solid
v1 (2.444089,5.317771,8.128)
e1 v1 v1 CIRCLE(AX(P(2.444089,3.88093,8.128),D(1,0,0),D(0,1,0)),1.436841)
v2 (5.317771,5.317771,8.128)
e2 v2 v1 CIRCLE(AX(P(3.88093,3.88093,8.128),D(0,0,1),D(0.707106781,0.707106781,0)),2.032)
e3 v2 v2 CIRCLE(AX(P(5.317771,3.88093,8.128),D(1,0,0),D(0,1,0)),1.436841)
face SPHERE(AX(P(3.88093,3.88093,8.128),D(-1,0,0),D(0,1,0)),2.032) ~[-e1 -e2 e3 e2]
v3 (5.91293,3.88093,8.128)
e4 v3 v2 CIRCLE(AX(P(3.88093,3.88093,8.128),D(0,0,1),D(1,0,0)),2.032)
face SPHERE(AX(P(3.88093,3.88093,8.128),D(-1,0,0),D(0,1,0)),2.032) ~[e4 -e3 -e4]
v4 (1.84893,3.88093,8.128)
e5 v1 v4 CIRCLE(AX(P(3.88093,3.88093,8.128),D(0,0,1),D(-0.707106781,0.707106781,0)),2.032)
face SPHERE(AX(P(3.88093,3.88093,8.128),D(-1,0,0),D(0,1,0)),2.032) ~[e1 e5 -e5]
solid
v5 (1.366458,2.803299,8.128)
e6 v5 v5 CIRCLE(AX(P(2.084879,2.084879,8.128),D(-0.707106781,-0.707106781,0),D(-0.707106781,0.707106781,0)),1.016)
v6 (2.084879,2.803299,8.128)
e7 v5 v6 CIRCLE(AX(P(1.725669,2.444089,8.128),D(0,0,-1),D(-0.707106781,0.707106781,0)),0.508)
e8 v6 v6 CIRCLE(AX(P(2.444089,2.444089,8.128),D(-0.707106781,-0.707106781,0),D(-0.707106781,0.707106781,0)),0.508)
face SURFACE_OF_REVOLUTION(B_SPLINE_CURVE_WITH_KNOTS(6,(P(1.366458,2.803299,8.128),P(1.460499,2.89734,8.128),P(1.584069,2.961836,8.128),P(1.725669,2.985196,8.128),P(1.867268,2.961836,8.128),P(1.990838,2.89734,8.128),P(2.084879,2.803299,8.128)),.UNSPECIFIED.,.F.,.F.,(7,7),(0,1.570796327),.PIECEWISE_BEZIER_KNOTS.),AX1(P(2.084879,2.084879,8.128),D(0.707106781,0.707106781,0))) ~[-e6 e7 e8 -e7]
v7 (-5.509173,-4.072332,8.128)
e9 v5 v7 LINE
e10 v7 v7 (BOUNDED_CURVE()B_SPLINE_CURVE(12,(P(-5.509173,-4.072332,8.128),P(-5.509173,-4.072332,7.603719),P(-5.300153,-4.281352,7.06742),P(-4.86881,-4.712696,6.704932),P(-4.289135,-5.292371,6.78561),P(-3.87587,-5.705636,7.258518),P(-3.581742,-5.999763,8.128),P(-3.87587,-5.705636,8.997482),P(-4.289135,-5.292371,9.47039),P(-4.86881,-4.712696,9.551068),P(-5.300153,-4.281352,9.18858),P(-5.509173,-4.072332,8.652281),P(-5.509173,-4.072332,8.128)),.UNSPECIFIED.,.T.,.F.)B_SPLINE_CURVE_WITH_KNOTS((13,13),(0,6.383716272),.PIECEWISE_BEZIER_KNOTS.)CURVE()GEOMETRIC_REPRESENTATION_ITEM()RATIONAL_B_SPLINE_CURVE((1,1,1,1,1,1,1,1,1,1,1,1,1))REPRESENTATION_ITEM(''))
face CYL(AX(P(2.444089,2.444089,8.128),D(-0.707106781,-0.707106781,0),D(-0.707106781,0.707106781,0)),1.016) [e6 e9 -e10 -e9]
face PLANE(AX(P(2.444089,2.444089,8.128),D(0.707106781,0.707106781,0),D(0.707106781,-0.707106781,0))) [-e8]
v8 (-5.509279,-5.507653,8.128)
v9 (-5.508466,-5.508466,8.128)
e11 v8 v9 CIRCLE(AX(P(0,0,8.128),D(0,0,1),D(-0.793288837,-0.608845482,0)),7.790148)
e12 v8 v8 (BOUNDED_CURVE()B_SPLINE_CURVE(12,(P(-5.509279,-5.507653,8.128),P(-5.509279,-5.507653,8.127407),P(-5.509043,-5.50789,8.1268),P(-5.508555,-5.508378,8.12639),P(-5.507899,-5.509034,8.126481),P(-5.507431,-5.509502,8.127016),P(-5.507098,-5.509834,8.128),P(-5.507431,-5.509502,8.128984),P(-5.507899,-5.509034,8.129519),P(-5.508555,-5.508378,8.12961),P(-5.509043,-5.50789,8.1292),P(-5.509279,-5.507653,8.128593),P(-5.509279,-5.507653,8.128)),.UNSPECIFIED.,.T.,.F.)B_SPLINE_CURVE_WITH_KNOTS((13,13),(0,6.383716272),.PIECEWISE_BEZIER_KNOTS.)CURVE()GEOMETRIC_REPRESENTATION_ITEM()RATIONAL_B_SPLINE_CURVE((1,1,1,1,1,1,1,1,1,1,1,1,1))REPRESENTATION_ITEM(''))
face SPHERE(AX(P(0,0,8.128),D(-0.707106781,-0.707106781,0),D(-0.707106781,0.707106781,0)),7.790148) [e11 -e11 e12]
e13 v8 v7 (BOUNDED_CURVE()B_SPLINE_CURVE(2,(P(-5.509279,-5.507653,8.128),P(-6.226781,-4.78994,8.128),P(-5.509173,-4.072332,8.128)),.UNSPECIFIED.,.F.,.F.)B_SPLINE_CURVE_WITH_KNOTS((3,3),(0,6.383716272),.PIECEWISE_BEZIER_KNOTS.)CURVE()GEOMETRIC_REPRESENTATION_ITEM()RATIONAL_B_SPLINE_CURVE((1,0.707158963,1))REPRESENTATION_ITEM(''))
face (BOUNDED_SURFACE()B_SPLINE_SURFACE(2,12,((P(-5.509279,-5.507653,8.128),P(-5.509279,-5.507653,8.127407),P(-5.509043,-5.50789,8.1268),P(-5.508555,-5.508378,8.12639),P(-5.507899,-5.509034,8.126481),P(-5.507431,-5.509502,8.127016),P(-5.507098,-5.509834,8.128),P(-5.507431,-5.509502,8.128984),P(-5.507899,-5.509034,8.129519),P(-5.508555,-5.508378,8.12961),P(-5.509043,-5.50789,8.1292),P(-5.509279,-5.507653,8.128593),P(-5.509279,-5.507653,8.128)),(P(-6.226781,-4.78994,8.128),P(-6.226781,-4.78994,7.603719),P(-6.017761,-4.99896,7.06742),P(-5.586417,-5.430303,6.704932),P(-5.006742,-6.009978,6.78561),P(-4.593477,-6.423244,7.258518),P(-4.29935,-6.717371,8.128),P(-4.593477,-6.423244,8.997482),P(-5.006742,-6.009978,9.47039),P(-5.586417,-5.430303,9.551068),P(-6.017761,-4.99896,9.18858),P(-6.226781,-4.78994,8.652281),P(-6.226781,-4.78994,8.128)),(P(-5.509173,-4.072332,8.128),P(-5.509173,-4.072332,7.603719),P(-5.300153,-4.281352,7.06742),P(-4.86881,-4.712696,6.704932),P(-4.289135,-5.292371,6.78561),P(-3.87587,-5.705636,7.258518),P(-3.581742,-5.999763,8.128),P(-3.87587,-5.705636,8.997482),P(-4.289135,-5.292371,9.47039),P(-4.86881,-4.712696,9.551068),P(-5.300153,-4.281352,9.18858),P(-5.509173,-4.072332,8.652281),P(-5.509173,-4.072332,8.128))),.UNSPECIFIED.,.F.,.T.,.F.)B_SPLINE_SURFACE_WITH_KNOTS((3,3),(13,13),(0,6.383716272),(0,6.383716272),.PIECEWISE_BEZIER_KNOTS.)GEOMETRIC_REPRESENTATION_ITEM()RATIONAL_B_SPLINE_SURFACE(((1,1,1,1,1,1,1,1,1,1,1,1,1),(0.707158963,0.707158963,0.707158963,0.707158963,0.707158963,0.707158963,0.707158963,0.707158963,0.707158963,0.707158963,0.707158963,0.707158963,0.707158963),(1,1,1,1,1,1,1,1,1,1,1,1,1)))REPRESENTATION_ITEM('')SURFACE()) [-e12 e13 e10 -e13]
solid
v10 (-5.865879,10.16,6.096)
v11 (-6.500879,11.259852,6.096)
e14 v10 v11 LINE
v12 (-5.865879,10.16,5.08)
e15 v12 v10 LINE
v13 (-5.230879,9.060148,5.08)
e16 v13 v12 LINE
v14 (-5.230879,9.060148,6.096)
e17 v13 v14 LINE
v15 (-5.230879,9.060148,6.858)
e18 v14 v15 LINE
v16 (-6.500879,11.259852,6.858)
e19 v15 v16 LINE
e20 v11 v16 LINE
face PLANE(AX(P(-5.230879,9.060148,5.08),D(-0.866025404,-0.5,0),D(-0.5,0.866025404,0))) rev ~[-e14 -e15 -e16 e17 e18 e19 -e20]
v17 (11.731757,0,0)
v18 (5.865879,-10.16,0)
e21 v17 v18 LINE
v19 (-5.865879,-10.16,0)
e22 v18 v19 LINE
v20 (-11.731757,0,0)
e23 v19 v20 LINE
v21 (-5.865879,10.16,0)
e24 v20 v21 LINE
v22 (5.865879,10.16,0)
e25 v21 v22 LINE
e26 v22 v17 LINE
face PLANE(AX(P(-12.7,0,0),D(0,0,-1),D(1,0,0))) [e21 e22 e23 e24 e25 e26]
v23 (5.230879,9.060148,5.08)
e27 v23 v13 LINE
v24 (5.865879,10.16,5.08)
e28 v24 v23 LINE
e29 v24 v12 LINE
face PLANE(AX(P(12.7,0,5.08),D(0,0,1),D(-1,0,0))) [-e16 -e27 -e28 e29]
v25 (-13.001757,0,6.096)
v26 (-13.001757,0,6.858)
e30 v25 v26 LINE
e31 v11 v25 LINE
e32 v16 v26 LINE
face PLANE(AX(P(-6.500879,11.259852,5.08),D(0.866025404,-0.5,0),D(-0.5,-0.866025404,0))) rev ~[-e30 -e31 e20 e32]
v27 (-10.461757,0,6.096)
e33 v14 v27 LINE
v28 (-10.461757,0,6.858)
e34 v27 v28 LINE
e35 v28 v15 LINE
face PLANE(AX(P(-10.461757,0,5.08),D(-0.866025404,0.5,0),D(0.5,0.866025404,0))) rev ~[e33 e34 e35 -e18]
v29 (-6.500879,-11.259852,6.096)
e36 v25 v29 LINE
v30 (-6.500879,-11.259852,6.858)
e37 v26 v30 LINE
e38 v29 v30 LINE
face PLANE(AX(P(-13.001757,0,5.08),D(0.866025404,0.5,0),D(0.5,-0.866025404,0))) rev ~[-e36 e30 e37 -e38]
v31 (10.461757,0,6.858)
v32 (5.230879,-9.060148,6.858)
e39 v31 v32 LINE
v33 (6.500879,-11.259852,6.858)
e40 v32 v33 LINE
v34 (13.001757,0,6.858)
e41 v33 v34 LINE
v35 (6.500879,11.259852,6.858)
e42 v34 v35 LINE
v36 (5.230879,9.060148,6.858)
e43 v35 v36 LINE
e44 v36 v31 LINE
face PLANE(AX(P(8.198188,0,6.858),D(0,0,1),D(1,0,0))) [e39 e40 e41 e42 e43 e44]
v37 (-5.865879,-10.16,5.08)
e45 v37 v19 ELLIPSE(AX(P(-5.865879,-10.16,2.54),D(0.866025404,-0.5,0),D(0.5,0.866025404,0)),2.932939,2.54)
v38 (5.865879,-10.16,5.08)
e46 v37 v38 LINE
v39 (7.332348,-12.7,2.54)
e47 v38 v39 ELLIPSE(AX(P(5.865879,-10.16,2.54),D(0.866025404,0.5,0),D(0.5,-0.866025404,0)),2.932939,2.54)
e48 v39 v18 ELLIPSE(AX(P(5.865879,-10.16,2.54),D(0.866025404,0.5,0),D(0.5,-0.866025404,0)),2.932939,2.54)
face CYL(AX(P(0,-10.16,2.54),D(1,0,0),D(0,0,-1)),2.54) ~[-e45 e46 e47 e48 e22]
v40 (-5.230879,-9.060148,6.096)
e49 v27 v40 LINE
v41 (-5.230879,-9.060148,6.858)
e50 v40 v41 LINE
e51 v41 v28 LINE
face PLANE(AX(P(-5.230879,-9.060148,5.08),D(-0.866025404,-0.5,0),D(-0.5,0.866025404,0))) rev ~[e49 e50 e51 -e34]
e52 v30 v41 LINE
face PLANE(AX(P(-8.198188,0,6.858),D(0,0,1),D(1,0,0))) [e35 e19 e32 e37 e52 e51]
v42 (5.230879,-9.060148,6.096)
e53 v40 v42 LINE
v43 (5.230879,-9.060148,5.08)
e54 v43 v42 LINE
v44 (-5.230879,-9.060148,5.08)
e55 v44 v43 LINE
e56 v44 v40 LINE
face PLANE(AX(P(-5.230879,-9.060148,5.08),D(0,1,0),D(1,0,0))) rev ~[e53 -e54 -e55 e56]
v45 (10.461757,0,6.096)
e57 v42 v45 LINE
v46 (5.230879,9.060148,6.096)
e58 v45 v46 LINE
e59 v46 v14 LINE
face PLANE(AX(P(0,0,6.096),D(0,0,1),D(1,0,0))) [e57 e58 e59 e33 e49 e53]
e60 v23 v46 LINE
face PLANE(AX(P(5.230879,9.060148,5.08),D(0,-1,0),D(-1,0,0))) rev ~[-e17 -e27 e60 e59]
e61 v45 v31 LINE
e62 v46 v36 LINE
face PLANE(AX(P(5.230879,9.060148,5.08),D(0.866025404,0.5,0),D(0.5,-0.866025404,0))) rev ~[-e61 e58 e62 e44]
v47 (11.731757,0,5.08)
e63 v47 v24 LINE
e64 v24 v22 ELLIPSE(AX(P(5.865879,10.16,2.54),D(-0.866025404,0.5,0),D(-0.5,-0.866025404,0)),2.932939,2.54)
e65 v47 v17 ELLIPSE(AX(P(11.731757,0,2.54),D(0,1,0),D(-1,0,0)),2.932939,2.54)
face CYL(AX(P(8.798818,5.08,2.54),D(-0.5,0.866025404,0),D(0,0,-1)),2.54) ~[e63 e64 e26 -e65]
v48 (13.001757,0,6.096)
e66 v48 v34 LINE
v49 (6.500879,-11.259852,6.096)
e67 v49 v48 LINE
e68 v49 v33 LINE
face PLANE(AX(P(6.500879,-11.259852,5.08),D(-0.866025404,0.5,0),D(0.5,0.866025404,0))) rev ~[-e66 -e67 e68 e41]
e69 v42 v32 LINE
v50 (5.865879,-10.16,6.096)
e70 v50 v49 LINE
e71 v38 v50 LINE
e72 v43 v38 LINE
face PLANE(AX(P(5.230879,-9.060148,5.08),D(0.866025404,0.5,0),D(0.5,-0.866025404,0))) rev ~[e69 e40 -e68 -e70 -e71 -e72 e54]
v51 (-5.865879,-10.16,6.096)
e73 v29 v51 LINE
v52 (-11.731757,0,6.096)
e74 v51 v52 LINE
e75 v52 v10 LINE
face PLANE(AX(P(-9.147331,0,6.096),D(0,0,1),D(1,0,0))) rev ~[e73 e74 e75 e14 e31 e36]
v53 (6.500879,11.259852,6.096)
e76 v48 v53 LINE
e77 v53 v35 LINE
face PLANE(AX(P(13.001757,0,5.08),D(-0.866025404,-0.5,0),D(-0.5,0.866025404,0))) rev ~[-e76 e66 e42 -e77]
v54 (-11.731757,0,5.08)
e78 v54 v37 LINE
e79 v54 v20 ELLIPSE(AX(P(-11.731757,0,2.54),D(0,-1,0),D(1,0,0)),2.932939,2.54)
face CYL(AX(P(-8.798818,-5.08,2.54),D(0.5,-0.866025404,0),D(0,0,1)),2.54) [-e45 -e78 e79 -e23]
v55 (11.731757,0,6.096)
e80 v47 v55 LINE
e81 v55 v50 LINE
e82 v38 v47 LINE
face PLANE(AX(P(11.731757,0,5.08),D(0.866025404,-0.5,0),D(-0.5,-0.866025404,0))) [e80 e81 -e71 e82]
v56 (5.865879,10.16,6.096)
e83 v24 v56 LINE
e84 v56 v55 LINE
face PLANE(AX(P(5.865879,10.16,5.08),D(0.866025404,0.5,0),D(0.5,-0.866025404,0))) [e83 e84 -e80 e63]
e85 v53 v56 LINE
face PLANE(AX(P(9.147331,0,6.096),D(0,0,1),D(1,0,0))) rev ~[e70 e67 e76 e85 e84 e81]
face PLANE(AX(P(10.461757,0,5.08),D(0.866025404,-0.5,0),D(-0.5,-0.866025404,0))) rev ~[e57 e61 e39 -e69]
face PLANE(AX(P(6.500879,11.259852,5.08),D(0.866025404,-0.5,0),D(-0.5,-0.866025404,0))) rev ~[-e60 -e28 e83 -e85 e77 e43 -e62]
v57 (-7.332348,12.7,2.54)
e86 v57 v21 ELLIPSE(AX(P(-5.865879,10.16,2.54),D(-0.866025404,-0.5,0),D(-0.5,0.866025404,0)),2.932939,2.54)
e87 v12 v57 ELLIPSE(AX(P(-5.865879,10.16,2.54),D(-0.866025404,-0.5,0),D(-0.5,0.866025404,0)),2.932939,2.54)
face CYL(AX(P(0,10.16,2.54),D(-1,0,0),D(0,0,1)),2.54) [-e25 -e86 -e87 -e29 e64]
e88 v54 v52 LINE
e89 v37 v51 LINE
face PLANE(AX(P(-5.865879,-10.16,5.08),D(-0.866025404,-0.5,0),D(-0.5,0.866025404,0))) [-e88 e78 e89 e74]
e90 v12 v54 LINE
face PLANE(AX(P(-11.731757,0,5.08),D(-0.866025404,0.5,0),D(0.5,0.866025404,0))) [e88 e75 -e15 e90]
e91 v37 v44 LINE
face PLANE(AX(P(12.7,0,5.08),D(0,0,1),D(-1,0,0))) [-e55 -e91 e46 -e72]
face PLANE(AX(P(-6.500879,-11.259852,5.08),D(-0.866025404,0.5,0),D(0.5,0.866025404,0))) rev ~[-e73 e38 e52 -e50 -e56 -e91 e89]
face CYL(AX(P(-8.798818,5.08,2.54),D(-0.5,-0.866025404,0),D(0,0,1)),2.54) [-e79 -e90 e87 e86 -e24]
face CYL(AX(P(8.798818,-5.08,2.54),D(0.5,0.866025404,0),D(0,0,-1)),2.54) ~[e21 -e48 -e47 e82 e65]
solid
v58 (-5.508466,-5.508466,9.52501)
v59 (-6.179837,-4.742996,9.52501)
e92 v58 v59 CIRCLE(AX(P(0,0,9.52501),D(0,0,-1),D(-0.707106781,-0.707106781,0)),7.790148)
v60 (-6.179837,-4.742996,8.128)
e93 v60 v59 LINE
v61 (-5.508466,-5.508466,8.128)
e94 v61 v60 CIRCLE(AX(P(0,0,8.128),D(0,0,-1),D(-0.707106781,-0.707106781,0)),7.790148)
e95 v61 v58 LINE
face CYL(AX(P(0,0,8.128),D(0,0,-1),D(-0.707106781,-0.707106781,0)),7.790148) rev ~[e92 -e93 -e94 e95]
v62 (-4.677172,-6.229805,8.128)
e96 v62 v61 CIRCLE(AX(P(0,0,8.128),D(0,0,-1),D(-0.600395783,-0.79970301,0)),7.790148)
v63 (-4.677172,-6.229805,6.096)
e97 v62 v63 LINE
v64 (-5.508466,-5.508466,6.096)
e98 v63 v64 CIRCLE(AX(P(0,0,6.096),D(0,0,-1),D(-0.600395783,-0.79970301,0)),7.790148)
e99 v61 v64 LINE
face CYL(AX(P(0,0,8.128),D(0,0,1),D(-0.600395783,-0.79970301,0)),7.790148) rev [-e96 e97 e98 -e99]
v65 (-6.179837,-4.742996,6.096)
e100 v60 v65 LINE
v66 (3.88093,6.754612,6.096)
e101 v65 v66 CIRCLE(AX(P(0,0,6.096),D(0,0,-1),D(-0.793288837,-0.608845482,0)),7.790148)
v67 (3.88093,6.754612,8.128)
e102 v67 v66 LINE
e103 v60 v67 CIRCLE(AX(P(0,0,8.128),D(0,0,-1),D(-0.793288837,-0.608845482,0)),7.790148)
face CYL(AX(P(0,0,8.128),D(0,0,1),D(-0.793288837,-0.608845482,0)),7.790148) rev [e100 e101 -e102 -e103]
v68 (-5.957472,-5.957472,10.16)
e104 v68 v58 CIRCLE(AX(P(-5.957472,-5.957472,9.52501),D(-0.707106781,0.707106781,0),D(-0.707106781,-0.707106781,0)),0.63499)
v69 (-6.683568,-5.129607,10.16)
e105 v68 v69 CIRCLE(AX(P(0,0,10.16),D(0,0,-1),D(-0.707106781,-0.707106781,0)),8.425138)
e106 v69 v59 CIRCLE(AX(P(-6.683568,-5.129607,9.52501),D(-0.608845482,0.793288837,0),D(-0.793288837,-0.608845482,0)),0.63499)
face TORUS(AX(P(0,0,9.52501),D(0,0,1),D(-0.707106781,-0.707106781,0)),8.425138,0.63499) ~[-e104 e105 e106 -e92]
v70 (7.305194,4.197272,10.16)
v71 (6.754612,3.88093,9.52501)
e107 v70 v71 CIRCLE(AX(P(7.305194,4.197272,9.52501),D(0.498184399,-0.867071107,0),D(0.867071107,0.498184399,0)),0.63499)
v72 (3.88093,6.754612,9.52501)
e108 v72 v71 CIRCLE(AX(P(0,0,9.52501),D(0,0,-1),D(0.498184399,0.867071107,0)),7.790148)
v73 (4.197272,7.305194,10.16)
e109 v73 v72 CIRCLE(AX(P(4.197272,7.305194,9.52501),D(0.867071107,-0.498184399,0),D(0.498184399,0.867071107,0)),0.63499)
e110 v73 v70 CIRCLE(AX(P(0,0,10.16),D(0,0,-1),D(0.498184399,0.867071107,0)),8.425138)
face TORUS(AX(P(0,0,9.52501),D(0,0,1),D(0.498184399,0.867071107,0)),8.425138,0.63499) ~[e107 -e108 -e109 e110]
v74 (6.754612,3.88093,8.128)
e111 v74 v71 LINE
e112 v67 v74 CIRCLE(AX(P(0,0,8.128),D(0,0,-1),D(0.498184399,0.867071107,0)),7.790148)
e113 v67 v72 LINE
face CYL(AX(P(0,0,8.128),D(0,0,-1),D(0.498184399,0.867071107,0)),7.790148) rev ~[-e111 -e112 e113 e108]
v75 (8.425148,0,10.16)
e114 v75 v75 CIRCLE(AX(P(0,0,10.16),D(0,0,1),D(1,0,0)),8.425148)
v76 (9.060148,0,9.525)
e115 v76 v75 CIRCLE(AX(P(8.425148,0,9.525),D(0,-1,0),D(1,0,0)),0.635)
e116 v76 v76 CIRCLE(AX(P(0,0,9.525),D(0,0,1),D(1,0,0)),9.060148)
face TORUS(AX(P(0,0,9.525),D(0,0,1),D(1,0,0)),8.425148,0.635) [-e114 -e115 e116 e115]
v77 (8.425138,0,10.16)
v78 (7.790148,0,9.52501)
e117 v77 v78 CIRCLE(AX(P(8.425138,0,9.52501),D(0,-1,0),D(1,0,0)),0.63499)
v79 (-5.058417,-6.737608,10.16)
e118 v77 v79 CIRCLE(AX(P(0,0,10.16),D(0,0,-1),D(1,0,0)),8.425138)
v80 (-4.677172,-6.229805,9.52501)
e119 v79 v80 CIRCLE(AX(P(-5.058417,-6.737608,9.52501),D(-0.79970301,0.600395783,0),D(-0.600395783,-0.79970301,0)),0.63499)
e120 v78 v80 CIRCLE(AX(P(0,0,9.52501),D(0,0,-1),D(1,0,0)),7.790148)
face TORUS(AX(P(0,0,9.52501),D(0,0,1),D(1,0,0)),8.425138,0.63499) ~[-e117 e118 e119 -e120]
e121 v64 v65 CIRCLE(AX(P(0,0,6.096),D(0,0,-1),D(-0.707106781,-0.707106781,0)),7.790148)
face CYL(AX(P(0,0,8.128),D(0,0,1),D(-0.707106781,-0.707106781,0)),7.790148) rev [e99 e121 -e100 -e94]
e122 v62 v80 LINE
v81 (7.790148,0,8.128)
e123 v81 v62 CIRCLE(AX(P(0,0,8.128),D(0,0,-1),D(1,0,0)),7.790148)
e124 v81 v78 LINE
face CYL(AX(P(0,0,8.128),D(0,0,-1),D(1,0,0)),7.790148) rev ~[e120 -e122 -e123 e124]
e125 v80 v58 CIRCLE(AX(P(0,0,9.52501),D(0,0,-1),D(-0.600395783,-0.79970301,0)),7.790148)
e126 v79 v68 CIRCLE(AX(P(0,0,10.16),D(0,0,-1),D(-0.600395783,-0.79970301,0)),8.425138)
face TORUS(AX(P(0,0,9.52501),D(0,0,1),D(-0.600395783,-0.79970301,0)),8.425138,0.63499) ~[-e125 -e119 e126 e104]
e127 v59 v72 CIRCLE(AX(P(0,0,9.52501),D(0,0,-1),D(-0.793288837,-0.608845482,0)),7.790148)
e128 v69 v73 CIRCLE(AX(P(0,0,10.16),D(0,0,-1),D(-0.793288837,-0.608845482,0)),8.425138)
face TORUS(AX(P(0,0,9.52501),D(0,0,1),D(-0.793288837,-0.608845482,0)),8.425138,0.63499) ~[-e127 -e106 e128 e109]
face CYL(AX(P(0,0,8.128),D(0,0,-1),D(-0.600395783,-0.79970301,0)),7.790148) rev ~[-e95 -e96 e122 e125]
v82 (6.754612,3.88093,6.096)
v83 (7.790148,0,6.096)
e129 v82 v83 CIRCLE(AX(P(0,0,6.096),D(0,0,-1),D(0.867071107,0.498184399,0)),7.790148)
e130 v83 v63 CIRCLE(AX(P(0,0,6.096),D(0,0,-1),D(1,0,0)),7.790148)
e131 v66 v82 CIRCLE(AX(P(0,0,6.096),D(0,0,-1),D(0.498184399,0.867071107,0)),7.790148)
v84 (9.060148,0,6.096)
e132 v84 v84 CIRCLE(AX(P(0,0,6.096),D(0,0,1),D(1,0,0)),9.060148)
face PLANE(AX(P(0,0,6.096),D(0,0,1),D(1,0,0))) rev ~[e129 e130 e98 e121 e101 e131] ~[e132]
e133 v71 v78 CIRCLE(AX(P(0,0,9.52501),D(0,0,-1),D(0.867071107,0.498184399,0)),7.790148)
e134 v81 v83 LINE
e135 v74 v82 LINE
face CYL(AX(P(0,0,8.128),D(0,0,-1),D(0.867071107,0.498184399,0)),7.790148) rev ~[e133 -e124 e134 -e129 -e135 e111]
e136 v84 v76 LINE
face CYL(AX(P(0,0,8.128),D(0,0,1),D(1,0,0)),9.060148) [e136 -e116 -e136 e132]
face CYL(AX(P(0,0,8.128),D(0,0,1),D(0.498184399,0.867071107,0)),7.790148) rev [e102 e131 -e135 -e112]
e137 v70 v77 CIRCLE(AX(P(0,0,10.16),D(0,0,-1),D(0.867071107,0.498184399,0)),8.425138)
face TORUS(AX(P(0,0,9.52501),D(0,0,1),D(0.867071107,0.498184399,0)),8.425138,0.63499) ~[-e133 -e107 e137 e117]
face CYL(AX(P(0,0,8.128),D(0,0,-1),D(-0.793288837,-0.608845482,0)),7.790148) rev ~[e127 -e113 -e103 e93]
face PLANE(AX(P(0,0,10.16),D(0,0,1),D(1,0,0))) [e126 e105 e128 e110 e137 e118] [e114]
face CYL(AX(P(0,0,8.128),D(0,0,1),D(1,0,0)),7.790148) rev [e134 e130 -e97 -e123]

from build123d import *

# Parameters (mm, degrees)
F1_DEPTH  = 12.7
F3_DEPTH  = 25.4
F6_DEPTH  = 25.4
F9_DEPTH  = 25.4
F11_DEPTH = 1.778
F12_DEPTH = 1.016
F13_DEPTH = 1.016
F18_R     = 1.015
F19_R     = 0.508
F15_R     = 9.0601477372
F20_DEPTH = 2.032
F21_R     = 0.635
F22_R     = 0.63499


# Not quite as in the source:
# - a fillet or chamfer is up to 0.001 mm smaller than in the source, because OpenCascade refuses the exact size


with BuildPart() as f1:
    # F0 (on Front) → F1 (new body, symmetric)
    with BuildSketch(Plane.XZ):
        with BuildLine():
            Line((-12.7, 0), (0, 0))
            Line((0, 0), (12.7, 0))
            ThreePointArc((12.7, 0), (15.24, 2.54), (12.7, 5.08))
            Line((12.7, 5.08), (-12.7, 5.08))
            ThreePointArc((-12.7, 5.08), (-15.24, 2.54), (-12.7, 0))
        make_face()
    extrude(amount=F1_DEPTH, both=True)

    # F2 (on Right) → F3 (cut, symmetric)
    with BuildSketch(Plane.YZ):
        with BuildLine():
            ThreePointArc((10.16, 5.08), (12.7, 2.54), (10.16, 0))
            Line((10.16, 0), (29.21, 0))
            Line((29.21, 0), (29.21, 5.08))
            Line((29.21, 5.08), (10.16, 5.08))
        make_face()
        with BuildLine():
            ThreePointArc((-10.16, 0), (-12.7, 2.54), (-10.16, 5.08))
            Line((-10.16, 5.08), (-29.21, 5.08))
            Line((-29.21, 5.08), (-29.21, 0))
            Line((-29.21, 0), (-10.16, 0))
        make_face()
    extrude(amount=F3_DEPTH, both=True, mode=Mode.SUBTRACT)

    # F5 (on line) → F6 (cut, symmetric)
    with BuildSketch(Plane(origin=(0, 0, 0), x_dir=(-0.8660254038, -0.5, 0), z_dir=(-0.5, 0.8660254038, 0))):
        with BuildLine():
            ThreePointArc((10.16, 5.08), (12.7, 2.54), (10.16, 0))
            Line((10.16, 0), (29.21, 0))
            Line((29.21, 0), (29.21, 5.08))
            Line((29.21, 5.08), (10.16, 5.08))
        make_face()
        with BuildLine():
            ThreePointArc((-10.16, 0), (-12.7, 2.54), (-10.16, 5.08))
            Line((-10.16, 5.08), (-29.21, 5.08))
            Line((-29.21, 5.08), (-29.21, 0))
            Line((-29.21, 0), (-10.16, 0))
        make_face()
    extrude(amount=F6_DEPTH, both=True, mode=Mode.SUBTRACT)

    # F8 (on line) → F9 (cut, symmetric)
    with BuildSketch(Plane(origin=(0, 0, 0), x_dir=(-0.8660254038, 0.5, 0), z_dir=(0.5, 0.8660254038, 0))):
        with BuildLine():
            ThreePointArc((10.16, 5.08), (12.7, 2.54), (10.16, 0))
            Line((10.16, 0), (29.21, 0))
            Line((29.21, 0), (29.21, 5.08))
            Line((29.21, 5.08), (10.16, 5.08))
        make_face()
        with BuildLine():
            ThreePointArc((-10.16, 0), (-12.7, 2.54), (-10.16, 5.08))
            Line((-10.16, 5.08), (-29.21, 5.08))
            Line((-29.21, 5.08), (-29.21, 0))
            Line((-29.21, 0), (-10.16, 0))
        make_face()
    extrude(amount=F9_DEPTH, both=True, mode=Mode.SUBTRACT)

    # F10 (on face) → F11 (join)
    with BuildSketch(Plane.XY.offset(5.08)):
        Polygon((-5.230878735, 9.0601477372), (-5.865878735, 10.16), (-11.7317574699, 0), (-5.865878735, -10.16), (-5.230878735, -9.0601477372), (-10.4617574699, 0), align=None)
        Polygon((-11.7317574699, 0), (-5.865878735, 10.16), (-6.500878735, 11.2598522628), (-13.0017574699, 0), (-6.500878735, -11.2598522628), (-5.865878735, -10.16), align=None)
        Polygon((11.7317574699, 0), (5.865878735, 10.16), (5.230878735, 9.0601477372), (10.4617574699, 0), (5.230878735, -9.0601477372), (5.865878735, -10.16), align=None)
        Polygon((6.500878735, 11.2598522628), (5.865878735, 10.16), (11.7317574699, 0), (5.865878735, -10.16), (6.500878735, -11.2598522628), (13.0017574699, 0), align=None)
    extrude(amount=F11_DEPTH)

    # F10 (on face) → F12 (cut)
    with BuildSketch(Plane.XY.offset(5.08)):
        Polygon((6.500878735, 11.2598522628), (5.865878735, 10.16), (11.7317574699, 0), (5.865878735, -10.16), (6.500878735, -11.2598522628), (13.0017574699, 0), align=None)
        Polygon((-11.7317574699, 0), (-5.865878735, 10.16), (-6.500878735, 11.2598522628), (-13.0017574699, 0), (-6.500878735, -11.2598522628), (-5.865878735, -10.16), align=None)
    extrude(amount=F12_DEPTH, mode=Mode.SUBTRACT)

    # F10 (on face) → F13 (join)
    with BuildSketch(Plane.XY.offset(5.08)):
        Polygon((10.4617574699, 0), (5.230878735, 9.0601477372), (-5.230878735, 9.0601477372), (-10.4617574699, 0), (-5.230878735, -9.0601477372), (5.230878735, -9.0601477372), align=None)
    extrude(amount=F13_DEPTH)


with BuildPart() as f16:
    # F15 (on offset) → F16 (revolve)
    with BuildSketch(Plane.XY.offset(8.128)):
        with BuildLine():
            ThreePointArc((5.9129300653, 3.8809300653), (5.7582532754, 4.6585427999), (5.3177710447, 5.3177710447))
            ThreePointArc((5.3177710447, 5.3177710447), (3.8809300653, 5.9129300653), (2.4440890859, 5.3177710447))
            ThreePointArc((2.4440890859, 5.3177710447), (2.0036068552, 4.6585427999), (1.8489300653, 3.8809300653))
            Line((1.8489300653, 3.8809300653), (5.9129300653, 3.8809300653))
        make_face()
    revolve(axis=Axis((3.8809300653, 3.8809300653, 8.128), (1, 0, 0)))


with BuildPart() as f17:
    # F15 (on offset) → F17 (revolve)
    with BuildSketch(Plane.XY.offset(8.128)):
        with BuildLine():
            ThreePointArc((-6.1798372366, -4.7429962572), (-5.8566710625, -5.1367115778), (-5.5084662914, -5.5084662914))
            Line((-5.5084662914, -5.5084662914), (0, 0))
            Line((0, 0), (2.4440890859, 2.4440890859))
            Line((2.4440890859, 2.4440890859), (1.7256685963, 3.1625095756))
            Line((1.7256685963, 3.1625095756), (-6.1798372366, -4.7429962572))
        make_face()
    revolve(axis=Axis((-2.7542331457, -2.7542331457, 8.128), (-0.7071067812, -0.7071067812, 0)))

    # F18 (radius 1.016 in the source; OpenCascade refuses exactly that, so slightly less here)
    f18_edges = [f17.edges().sort_by_distance(p)[0] for p in [
        (-4.742996, -6.179837, 8.128),
    ]]
    fillet(f18_edges, radius=F18_R)

    # F19
    f19_edges = [f17.edges().sort_by_distance(p)[0] for p in [
        (3.16251, 1.725669, 8.128),
    ]]
    fillet(f19_edges, radius=F19_R)


with BuildPart() as f20:
    # F15 (on offset) → F20 (new body, symmetric)
    with BuildSketch(Plane.XY.offset(8.128)):
        Circle(F15_R)
        with BuildLine():
            ThreePointArc((6.7546120241, 3.8809300653), (7.5268129823, 2.0083545743), (7.7901477372, 0))
            ThreePointArc((7.7901477372, 0), (3.4821359873, -6.9685816874), (-4.6771718494, -6.2298045923))
            ThreePointArc((-4.6771718494, -6.2298045923), (-5.10557424, -5.8838349269), (-5.5084662914, -5.5084662914))
            ThreePointArc((-5.5084662914, -5.5084662914), (-5.8566710625, -5.1367115778), (-6.1798372366, -4.7429962572))
            ThreePointArc((-6.1798372366, -4.7429962572), (-5.8625926511, 5.129952161), (3.8809300653, 6.7546120241))
            ThreePointArc((3.8809300653, 6.7546120241), (5.5084662914, 5.5084662914), (6.7546120241, 3.8809300653))
        make_face(mode=Mode.SUBTRACT)
    extrude(amount=F20_DEPTH, both=True)

    # F21
    f21_edges = [f20.edges().sort_by_distance(p)[0] for p in [
        (-9.060148, 0, 10.16),
    ]]
    fillet(f21_edges, radius=F21_R)

    # F22 (radius 0.635 in the source; OpenCascade refuses exactly that, so slightly less here)
    f22_edges = [f20.edges().sort_by_distance(p)[0] for p in [
        (-5.862593, 5.129952, 10.16),
    ]]
    fillet(f22_edges, radius=F22_R)


solid = Compound([f1.part, f16.part, f17.part, f20.part])
